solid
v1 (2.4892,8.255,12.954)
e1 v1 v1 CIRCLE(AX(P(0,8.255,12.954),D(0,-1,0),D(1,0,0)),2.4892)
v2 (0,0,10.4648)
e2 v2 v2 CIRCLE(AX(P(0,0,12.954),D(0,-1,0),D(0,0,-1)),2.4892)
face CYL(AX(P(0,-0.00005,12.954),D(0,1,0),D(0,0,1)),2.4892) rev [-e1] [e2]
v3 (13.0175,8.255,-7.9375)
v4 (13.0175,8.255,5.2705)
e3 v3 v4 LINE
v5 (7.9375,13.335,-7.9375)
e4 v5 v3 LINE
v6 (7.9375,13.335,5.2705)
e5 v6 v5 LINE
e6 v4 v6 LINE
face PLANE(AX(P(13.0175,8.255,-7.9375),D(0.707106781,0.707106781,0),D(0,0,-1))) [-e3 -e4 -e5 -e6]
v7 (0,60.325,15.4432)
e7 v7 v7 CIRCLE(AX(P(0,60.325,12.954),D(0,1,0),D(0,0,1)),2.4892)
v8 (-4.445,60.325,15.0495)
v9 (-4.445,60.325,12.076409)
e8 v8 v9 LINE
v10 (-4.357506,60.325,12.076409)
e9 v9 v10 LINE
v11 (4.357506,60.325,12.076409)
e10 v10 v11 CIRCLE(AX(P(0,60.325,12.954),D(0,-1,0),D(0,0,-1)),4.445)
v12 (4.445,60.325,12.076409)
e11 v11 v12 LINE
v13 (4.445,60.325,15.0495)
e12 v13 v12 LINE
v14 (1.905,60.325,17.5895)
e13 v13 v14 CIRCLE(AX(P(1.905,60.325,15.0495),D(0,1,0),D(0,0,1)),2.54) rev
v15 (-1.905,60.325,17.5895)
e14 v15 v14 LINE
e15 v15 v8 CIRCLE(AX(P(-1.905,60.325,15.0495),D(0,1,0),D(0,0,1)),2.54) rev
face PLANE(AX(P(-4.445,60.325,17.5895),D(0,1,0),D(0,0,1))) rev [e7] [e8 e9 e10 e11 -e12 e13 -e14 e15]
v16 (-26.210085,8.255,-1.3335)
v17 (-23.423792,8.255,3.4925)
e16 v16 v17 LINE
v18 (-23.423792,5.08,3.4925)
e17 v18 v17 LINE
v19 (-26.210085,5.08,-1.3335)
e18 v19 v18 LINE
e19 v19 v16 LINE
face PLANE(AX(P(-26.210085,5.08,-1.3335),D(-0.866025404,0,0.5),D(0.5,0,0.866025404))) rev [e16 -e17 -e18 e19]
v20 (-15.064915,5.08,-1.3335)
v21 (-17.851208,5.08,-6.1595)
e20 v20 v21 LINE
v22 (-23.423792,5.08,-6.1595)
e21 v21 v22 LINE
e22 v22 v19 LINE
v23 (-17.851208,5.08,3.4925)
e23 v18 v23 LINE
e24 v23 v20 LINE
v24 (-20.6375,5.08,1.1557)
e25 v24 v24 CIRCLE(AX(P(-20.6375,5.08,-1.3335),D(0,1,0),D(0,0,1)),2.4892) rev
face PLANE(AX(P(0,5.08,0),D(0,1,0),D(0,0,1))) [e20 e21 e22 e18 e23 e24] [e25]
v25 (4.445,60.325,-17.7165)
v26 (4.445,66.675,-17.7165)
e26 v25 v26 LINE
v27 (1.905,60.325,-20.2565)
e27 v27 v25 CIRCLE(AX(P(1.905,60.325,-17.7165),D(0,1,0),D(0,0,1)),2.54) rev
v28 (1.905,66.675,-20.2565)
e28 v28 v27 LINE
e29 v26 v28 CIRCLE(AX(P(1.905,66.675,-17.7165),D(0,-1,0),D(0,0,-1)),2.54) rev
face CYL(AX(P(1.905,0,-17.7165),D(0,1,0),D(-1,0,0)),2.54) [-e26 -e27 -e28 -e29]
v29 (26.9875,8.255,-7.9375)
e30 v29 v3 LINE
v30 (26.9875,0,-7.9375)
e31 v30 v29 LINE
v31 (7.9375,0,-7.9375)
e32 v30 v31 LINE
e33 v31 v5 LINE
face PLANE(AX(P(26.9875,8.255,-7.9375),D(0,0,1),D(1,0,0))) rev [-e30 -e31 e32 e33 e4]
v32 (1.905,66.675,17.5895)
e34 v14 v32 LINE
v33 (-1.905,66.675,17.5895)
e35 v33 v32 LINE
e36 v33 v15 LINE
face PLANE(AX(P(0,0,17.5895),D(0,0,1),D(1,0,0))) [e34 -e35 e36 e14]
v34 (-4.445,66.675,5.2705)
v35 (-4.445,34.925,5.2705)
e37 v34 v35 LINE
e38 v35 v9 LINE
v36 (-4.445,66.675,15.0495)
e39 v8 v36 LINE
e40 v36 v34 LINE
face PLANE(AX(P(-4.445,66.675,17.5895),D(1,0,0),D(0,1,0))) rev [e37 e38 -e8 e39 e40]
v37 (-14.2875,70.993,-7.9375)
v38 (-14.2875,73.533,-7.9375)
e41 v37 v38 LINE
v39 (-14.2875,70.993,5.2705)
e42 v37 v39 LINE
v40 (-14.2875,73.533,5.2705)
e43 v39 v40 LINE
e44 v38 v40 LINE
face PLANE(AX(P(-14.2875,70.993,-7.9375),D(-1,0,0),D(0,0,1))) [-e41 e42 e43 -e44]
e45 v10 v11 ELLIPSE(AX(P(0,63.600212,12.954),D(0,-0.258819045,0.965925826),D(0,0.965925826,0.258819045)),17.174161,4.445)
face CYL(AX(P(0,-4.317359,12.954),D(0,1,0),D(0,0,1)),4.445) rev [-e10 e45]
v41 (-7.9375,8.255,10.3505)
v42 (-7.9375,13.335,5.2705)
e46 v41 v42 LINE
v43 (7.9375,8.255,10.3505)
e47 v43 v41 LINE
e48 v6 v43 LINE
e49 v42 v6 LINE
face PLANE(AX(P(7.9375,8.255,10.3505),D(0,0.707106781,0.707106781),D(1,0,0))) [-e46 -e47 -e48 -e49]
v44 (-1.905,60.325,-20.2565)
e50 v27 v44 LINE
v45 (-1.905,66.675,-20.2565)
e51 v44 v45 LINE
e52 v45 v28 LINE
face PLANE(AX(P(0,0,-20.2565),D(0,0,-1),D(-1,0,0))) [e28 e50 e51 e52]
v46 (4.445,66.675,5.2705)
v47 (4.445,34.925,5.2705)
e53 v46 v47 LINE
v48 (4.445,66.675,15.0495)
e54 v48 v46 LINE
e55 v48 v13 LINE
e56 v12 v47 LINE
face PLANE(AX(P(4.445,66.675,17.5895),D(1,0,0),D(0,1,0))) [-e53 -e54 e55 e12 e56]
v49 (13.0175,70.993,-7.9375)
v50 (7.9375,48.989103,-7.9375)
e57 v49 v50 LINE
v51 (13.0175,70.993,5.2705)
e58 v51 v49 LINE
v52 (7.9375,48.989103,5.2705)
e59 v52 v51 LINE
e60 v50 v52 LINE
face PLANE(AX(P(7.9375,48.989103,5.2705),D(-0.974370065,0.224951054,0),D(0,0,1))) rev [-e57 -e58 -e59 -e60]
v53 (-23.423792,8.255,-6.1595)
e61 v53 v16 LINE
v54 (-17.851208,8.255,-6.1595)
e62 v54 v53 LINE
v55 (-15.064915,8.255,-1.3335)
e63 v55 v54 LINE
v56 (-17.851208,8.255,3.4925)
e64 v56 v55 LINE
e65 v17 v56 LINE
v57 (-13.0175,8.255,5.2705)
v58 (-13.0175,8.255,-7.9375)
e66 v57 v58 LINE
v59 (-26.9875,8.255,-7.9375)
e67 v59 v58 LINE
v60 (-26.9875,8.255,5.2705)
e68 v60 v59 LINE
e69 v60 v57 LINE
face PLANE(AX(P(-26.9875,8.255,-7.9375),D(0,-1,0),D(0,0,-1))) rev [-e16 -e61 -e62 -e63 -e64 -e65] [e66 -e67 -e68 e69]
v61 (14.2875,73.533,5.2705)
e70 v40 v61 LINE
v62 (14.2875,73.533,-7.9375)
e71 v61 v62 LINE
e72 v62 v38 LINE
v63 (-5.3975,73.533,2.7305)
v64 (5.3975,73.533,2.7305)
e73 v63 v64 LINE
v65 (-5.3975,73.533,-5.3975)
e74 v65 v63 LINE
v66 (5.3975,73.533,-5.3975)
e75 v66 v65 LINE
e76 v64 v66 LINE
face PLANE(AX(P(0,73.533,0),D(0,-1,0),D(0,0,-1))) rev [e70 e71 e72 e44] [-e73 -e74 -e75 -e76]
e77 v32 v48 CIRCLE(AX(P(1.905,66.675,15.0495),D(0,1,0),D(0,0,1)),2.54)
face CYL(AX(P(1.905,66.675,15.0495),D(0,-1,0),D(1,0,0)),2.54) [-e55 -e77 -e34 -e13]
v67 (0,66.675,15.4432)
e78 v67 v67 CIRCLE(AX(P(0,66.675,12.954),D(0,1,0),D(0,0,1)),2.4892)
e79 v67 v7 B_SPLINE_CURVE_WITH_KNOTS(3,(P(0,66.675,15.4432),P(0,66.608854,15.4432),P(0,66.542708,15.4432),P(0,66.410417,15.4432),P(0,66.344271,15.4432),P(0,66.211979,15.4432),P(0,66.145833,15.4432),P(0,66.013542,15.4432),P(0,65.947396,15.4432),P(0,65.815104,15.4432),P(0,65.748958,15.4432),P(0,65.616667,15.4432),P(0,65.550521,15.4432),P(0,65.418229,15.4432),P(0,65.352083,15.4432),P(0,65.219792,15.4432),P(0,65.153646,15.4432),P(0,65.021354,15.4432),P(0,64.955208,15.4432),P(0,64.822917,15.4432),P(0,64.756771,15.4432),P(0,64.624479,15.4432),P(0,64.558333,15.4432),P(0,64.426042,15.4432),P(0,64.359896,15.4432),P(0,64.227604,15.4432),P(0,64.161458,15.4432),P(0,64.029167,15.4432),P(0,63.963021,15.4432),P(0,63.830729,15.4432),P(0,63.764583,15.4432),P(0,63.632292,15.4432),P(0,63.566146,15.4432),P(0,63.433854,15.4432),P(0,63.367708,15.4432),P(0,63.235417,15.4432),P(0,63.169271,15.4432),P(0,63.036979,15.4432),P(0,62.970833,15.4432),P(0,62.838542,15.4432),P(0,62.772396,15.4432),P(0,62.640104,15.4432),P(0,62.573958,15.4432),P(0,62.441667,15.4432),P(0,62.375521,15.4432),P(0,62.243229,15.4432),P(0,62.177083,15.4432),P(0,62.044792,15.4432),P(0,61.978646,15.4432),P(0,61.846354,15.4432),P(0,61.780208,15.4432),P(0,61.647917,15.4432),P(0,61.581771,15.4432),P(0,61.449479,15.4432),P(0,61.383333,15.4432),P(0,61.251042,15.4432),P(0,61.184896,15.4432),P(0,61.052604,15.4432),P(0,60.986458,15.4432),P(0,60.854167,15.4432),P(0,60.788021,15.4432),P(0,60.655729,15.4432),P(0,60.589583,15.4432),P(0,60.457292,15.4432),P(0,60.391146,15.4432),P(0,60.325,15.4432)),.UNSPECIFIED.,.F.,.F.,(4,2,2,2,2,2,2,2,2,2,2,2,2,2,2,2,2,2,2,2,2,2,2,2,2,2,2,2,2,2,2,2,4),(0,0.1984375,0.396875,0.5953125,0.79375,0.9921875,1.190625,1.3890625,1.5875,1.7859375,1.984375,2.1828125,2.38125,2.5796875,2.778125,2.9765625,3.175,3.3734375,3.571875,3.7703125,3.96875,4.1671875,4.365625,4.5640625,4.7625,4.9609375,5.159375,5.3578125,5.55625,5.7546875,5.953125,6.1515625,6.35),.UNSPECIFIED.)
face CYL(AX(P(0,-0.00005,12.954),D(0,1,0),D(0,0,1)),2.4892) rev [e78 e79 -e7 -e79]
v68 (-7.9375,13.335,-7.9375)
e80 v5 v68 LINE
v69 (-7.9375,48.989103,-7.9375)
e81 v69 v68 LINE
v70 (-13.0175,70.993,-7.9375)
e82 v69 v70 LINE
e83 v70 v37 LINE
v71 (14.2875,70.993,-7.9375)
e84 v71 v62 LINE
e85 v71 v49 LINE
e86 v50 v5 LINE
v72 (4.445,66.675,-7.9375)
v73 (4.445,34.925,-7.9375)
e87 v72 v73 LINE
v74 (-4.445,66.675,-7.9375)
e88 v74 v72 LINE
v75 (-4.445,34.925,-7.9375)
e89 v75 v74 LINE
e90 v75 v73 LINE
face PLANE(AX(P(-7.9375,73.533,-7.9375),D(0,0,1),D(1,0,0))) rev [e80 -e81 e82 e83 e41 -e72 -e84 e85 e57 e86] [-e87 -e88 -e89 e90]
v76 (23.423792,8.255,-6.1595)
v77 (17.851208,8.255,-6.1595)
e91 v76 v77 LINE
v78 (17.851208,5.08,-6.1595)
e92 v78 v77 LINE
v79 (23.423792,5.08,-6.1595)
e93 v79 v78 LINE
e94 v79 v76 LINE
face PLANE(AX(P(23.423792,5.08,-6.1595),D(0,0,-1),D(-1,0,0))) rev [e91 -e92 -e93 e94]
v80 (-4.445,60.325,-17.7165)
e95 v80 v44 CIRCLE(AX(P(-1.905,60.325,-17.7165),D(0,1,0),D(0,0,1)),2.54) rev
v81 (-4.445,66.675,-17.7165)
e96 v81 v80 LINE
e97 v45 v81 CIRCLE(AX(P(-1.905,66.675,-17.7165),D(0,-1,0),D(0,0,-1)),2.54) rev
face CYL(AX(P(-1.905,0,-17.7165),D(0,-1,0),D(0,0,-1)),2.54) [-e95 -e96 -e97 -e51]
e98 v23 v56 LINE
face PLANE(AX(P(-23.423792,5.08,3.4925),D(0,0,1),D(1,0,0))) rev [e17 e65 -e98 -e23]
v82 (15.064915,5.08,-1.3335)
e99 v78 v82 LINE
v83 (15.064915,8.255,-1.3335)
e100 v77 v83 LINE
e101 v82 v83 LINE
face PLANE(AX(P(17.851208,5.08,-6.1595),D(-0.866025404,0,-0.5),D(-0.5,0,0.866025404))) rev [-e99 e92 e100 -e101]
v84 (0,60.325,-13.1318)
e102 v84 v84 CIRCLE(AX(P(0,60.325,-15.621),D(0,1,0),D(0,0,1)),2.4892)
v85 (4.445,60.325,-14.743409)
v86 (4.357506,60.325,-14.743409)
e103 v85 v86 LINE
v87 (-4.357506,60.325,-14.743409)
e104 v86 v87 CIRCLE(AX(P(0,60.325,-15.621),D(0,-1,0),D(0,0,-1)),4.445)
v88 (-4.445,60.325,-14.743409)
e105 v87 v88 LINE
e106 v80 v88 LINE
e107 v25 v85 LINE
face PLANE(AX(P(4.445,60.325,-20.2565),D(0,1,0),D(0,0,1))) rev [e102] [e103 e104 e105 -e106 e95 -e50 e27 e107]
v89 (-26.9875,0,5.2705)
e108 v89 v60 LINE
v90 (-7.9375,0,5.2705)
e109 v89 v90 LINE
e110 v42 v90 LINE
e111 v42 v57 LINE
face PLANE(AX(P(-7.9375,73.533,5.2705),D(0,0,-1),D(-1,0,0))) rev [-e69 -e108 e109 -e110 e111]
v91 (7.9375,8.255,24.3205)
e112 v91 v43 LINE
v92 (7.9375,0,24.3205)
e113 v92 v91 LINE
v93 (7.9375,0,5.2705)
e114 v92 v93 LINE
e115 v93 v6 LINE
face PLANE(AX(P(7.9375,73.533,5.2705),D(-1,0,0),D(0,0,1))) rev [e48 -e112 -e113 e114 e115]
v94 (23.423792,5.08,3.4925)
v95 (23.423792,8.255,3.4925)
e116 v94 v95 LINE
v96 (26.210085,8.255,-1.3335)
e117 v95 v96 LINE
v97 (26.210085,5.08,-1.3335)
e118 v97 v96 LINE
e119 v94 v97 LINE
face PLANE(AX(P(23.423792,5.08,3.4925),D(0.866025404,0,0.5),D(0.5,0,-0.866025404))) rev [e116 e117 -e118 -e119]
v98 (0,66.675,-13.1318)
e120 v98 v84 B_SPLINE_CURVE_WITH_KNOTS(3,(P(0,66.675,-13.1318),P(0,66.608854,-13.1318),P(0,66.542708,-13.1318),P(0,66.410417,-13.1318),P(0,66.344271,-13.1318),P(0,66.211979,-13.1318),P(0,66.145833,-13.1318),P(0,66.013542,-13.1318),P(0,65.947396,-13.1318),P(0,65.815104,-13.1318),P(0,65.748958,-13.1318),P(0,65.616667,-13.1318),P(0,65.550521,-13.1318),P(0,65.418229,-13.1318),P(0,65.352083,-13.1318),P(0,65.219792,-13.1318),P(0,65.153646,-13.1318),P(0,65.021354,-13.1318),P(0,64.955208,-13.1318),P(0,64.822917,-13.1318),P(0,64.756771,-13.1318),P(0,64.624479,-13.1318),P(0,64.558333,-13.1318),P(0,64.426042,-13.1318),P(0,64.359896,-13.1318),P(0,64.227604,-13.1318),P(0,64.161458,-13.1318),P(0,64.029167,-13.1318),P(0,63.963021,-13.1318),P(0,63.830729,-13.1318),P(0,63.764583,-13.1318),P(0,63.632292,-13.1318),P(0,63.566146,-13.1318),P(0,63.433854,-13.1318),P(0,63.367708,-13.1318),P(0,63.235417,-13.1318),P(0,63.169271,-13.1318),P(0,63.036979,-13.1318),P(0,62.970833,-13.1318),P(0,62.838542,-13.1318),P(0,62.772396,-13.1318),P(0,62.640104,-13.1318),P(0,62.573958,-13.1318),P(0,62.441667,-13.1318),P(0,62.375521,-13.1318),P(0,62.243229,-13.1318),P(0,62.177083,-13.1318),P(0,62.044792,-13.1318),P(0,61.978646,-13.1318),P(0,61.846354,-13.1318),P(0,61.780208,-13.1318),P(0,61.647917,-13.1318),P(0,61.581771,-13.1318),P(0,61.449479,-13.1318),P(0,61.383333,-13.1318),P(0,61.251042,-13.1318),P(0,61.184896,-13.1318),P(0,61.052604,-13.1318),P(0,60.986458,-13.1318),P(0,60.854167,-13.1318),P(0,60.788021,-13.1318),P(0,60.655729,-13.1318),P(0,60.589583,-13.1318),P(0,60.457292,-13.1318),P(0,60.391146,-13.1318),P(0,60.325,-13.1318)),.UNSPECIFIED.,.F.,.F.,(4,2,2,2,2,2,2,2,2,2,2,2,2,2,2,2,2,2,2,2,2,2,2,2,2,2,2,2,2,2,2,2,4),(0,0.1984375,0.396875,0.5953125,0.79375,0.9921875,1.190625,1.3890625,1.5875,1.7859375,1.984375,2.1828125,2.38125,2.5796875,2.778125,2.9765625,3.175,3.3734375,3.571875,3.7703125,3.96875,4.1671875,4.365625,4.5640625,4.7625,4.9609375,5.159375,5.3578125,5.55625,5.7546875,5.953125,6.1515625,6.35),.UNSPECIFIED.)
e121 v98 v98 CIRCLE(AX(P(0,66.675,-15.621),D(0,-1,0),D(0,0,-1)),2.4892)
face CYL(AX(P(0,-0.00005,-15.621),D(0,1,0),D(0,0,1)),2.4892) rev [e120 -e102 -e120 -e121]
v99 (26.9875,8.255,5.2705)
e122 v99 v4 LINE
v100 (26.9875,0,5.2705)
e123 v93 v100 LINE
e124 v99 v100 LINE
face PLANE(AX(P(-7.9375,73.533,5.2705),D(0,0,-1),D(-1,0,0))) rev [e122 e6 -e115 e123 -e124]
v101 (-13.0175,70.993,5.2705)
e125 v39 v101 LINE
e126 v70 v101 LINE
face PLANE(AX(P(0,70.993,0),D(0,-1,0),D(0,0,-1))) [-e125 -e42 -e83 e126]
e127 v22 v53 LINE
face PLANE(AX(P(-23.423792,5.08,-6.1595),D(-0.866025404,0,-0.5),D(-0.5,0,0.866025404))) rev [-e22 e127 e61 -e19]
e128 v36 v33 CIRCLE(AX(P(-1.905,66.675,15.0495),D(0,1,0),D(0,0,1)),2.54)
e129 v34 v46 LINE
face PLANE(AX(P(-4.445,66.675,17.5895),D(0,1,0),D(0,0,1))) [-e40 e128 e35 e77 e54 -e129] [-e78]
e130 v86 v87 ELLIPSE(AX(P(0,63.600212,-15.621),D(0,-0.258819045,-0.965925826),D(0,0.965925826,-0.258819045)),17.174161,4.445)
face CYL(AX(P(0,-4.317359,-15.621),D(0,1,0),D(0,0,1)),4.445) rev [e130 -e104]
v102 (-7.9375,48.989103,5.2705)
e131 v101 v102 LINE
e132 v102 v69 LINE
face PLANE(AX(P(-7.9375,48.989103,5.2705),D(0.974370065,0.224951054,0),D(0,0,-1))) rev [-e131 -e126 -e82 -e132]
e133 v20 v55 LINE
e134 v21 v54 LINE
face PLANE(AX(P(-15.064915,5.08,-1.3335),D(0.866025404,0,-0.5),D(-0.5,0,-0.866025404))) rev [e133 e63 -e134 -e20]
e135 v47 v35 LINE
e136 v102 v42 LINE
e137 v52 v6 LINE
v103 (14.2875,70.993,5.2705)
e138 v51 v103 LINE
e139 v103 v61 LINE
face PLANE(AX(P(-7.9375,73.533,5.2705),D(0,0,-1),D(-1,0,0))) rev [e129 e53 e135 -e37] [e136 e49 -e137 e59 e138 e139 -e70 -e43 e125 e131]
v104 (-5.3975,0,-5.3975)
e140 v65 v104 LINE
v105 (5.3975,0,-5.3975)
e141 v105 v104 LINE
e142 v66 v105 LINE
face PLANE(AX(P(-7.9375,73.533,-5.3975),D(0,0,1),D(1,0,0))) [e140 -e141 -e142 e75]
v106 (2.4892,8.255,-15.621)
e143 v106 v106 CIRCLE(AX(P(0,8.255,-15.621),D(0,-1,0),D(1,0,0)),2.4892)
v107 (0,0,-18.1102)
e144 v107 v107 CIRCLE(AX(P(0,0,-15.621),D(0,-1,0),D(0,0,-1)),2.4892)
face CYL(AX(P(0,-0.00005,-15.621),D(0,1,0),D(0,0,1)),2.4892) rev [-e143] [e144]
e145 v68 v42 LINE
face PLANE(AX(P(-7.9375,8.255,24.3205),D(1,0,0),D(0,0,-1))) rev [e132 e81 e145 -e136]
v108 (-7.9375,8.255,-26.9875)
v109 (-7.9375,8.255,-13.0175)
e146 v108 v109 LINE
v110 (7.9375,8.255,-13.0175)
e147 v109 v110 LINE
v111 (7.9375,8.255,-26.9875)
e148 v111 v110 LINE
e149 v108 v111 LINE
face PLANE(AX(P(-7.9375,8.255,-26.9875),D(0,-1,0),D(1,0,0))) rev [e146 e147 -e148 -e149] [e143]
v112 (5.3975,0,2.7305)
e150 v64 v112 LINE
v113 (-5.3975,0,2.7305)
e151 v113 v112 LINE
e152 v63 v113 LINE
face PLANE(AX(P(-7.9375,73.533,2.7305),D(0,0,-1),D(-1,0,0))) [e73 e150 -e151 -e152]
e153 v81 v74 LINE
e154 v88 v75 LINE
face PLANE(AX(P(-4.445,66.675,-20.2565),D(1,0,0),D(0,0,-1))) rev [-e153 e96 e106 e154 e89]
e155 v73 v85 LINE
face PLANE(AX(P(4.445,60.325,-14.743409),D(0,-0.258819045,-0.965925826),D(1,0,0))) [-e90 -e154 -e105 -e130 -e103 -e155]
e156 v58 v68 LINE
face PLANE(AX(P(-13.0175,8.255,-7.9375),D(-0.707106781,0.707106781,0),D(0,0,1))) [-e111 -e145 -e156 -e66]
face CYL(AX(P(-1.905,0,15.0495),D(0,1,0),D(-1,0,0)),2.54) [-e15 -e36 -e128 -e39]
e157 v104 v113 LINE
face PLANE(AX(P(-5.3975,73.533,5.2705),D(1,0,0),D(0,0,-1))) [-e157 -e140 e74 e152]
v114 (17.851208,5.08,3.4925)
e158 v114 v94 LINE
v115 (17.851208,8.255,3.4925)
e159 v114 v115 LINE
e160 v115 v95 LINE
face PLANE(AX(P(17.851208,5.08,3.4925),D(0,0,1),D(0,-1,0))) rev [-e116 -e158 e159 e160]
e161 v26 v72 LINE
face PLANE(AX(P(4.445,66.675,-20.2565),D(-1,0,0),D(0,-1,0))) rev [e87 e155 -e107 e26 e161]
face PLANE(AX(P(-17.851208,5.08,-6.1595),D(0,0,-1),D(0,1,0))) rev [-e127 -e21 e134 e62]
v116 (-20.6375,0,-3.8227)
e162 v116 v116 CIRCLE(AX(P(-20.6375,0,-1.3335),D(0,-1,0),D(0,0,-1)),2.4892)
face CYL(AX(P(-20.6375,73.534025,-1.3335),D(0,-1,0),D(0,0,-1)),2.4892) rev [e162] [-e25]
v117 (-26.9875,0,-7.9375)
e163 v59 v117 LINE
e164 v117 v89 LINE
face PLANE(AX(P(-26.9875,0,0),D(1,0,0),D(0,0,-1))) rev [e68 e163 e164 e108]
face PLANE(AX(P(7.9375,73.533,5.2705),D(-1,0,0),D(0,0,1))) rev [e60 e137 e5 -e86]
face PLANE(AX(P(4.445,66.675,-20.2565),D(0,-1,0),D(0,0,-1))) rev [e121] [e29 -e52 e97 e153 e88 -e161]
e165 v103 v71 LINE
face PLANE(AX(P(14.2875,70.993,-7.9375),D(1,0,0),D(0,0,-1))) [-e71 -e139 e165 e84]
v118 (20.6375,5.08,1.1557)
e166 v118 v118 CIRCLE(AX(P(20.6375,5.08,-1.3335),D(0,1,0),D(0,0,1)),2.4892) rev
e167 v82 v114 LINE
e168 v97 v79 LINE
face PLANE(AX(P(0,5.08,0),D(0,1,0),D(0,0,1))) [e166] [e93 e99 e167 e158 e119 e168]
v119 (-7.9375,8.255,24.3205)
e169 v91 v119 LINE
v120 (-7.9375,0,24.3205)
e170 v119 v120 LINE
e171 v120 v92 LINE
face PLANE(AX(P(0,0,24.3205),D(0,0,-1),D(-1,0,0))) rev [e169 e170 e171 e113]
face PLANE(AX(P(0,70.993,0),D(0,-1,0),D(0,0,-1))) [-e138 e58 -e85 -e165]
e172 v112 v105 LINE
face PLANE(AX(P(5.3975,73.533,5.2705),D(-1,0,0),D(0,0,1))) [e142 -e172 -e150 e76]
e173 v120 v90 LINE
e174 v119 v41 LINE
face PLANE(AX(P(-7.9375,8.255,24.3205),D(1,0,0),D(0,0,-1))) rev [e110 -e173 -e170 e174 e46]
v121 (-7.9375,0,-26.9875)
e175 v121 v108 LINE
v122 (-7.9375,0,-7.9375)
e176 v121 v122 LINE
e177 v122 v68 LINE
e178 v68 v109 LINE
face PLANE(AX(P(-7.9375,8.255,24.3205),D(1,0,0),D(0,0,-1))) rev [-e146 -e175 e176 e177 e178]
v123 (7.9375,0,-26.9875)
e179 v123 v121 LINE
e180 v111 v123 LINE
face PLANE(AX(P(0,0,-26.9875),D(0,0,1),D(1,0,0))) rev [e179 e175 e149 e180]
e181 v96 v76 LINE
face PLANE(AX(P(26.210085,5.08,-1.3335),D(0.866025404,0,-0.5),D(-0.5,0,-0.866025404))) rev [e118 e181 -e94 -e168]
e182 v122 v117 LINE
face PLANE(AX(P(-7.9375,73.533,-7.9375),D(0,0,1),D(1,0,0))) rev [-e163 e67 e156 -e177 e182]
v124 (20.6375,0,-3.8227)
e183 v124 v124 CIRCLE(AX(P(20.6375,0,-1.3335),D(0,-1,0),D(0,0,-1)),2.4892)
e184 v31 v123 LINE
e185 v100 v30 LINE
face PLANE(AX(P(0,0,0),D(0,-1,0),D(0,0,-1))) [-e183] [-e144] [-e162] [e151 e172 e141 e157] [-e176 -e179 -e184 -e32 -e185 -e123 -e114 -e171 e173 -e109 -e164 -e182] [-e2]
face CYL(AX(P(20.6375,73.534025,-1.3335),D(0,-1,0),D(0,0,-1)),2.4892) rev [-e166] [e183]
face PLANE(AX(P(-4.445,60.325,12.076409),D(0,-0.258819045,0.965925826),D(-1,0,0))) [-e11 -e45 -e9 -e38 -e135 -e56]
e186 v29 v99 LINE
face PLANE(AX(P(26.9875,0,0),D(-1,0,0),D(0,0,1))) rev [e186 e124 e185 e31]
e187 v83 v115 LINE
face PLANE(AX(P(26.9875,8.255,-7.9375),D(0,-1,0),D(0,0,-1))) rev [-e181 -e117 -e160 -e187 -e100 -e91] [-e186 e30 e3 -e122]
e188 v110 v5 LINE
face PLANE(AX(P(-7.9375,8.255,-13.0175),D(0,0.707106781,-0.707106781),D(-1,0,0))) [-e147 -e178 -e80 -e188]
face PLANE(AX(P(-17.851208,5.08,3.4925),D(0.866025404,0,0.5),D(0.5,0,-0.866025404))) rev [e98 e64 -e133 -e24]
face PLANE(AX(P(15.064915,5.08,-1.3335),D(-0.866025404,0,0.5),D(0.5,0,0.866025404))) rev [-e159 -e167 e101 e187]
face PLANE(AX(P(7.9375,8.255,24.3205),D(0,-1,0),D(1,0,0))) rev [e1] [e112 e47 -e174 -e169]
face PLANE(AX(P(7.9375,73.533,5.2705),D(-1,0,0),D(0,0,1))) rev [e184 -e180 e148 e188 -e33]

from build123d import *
from OCP.BRepFilletAPI import BRepFilletAPI_MakeChamfer

# Parameters (mm, degrees)
SKETCH1_W           = 15.875
SKETCH1_H           = 13.208
BOSS_EXTRUDE1_DEPTH = 73.533
SHELL1_T            = -2.54
SKETCH3_W           = 8.89
SKETCH3_H           = 6.35
BOSS_EXTRUDE2_DEPTH = 12.319
SKETCH4_W           = 8.89
SKETCH4_H           = 6.35
BOSS_EXTRUDE3_DEPTH = 12.319
SKETCH5_W           = 13.208
SKETCH5_H           = 8.255
BOSS_EXTRUDE4_DEPTH = 19.05
SKETCH6_W           = 15.875
SKETCH6_H           = 8.255
BOSS_EXTRUDE5_DEPTH = 19.05
SKETCH7_W           = 13.208
SKETCH7_H           = 8.255
BOSS_EXTRUDE6_DEPTH = 19.05
SKETCH8_W           = 15.875
SKETCH8_H           = 8.255
BOSS_EXTRUDE7_DEPTH = 19.05
SKETCH9_R           = 2.4892
CUT_EXTRUDE1_DEPTH  = 83.847766424
CUT_EXTRUDE2_REACH  = 84.848
SKETCH11_R          = 2.4892
FILLET3_R           = 2.54
CHAMFER2_SIZE       = 25.4
CHAMFER2_SIZE_2     = 6.805909488
SKETCH12_R          = 4.445
CUT_EXTRUDE3_DEPTH  = 52.07
SKETCH13_W          = 28.575
SKETCH13_H          = 13.208
SKETCH13_W_2        = 10.795
SKETCH13_H_2        = 8.128
BOSS_EXTRUDE8_DEPTH = 2.54
CHAMFER3_SIZE       = 5.08
CHAMFER3_SIZE2      = 22.003897441
CHAMFER4_SIZE       = 5.08
CHAMFER5_SIZE       = 5.08
CUT_EXTRUDE4_DEPTH  = 3.175
CUT_EXTRUDE5_DEPTH  = 3.175


# Some blends are built 0.0001 mm under size
with BuildPart() as part:
    # Sketch1 → Boss-Extrude1 (new body)
    with BuildSketch(Plane(origin=(0, 0, 0), x_dir=(1, 0, 0), z_dir=(0, 1, 0))):
        with Locations((0, 1.3335)):
            Rectangle(SKETCH1_W, SKETCH1_H)
    extrude(amount=BOSS_EXTRUDE1_DEPTH)

    # Shell1
    shell1_openings = [part.faces().sort_by_distance(p)[0] for p in [
        (0, 73.533, -1.3335),
        (0, 0, -1.3335),
    ]]
    offset(amount=SHELL1_T, openings=shell1_openings, kind=Kind.INTERSECTION)

    # Sketch3 → Boss-Extrude2 (add)
    with BuildSketch(Plane(origin=(0, 0, -7.9375), x_dir=(-1, 0, 0), z_dir=(0, 0, -1))):
        with Locations((0, 63.5)):
            Rectangle(SKETCH3_W, SKETCH3_H)
    extrude(amount=BOSS_EXTRUDE2_DEPTH)

    # Sketch4 → Boss-Extrude3 (add)
    with BuildSketch(Plane.XY.offset(5.2705)):
        with Locations((0, 63.5)):
            Rectangle(SKETCH4_W, SKETCH4_H)
    extrude(amount=BOSS_EXTRUDE3_DEPTH)

    # Sketch5 → Boss-Extrude4 (add)
    with BuildSketch(Plane.ZY.offset(7.9375)):
        with Locations((-1.3335, 4.1275)):
            Rectangle(SKETCH5_W, SKETCH5_H)
    extrude(amount=BOSS_EXTRUDE4_DEPTH)

    # Sketch6 → Boss-Extrude5 (add)
    with BuildSketch(Plane(origin=(0, 0, -7.9375), x_dir=(-1, 0, 0), z_dir=(0, 0, -1))):
        with Locations((0, 4.1275)):
            Rectangle(SKETCH6_W, SKETCH6_H)
    extrude(amount=BOSS_EXTRUDE5_DEPTH)

    # Sketch7 → Boss-Extrude6 (add)
    with BuildSketch(Plane(origin=(7.9375, 0, 0), x_dir=(0, 0, -1), z_dir=(1, 0, 0))):
        with Locations((1.3335, 4.1275)):
            Rectangle(SKETCH7_W, SKETCH7_H)
    extrude(amount=BOSS_EXTRUDE6_DEPTH)

    # Sketch8 → Boss-Extrude7 (add)
    with BuildSketch(Plane.XY.offset(5.2705)):
        with Locations((0, 4.1275)):
            Rectangle(SKETCH8_W, SKETCH8_H)
    extrude(amount=BOSS_EXTRUDE7_DEPTH)

    # Sketch9 → Cut-Extrude1 (cut, through all)
    with BuildSketch(Plane(origin=(0, 73.533, 0), x_dir=(1, 0, 0), z_dir=(0, 1, 0))):
        with Locations((0, 15.621)):
            Circle(SKETCH9_R)
        with Locations((0, -12.954)):
            Circle(SKETCH9_R)
    extrude(amount=-CUT_EXTRUDE1_DEPTH, mode=Mode.SUBTRACT)

    # Sketch11 → Cut-Extrude2 (cut, up to next)
    with BuildSketch(Plane(origin=(0, 0, 0), x_dir=(-1, 0, 0), z_dir=(0, -1, 0)), mode=Mode.PRIVATE) as cut_extrude2_sk1:
        with Locations(Location((20.6375, 1.3335, 0), (0, 0, 90))):
            Circle(SKETCH11_R)
    cut_extrude2_tool1 = extrude(cut_extrude2_sk1.sketch, amount=-CUT_EXTRUDE2_REACH, mode=Mode.PRIVATE) & part.part
    # Sketch11 → Cut-Extrude2 (cut, up to next)
    with BuildSketch(Plane(origin=(0, 0, 0), x_dir=(-1, 0, 0), z_dir=(0, -1, 0)), mode=Mode.PRIVATE) as cut_extrude2_sk2:
        with Locations(Location((-20.6375, 1.3335, 0), (0, 0, 90))):
            Circle(SKETCH11_R)
    cut_extrude2_tool2 = extrude(cut_extrude2_sk2.sketch, amount=-CUT_EXTRUDE2_REACH, mode=Mode.PRIVATE) & part.part
    add(cut_extrude2_tool1.solids().sort_by_distance((-20.6375, 0, -1.3335))[0], mode=Mode.SUBTRACT)
    add(cut_extrude2_tool2.solids().sort_by_distance((20.6375, 0, -1.3335))[0], mode=Mode.SUBTRACT)

    # Fillet3
    fillet3_edges = [part.edges().sort_by_distance(p)[0] for p in [
        (4.445, 63.5, -20.2565),
        (-4.445, 63.5, -20.2565),
        (4.445, 63.5, 17.5895),
        (-4.445, 63.5, 17.5895),
    ]]
    fillet(fillet3_edges, radius=FILLET3_R)

    # Chamfer2
    # the kernel refuses this chamfer: 25.4, 6.805909488 mm, written as the material it adds along each edge
    with BuildSketch(Plane(origin=(-4.445, 60.325, -7.9375), x_dir=(0, -0.9999503267608393, 0.00996714657715642), z_dir=(1, 0, 0))) as chamfer2_piece_1_section:
        Polygon((CHAMFER2_SIZE * 0.999950326761, CHAMFER2_SIZE * 0.00996714657716), (-CHAMFER2_SIZE_2 * 0.00996714657679, CHAMFER2_SIZE_2 * 0.999950326724), (0, 0), align=None)
    chamfer2_piece_1 = extrude(amount=8.89, mode=Mode.PRIVATE)
    chamfer2_piece_1 = chamfer2_piece_1 - Plane(origin=(0, 51.301210878, -15.621), x_dir=(1, 0, 0), z_dir=(0, 1, 0)) * Cylinder(2.4892, 120, mode=Mode.PRIVATE)
    add(chamfer2_piece_1)
    with BuildSketch(Plane(origin=(4.445, 60.325, 5.2705), x_dir=(0, -0.9999503267608393, -0.00996714657715642), z_dir=(-1, 0, 0))) as chamfer2_piece_2_section:
        Polygon((CHAMFER2_SIZE * 0.999950326761, CHAMFER2_SIZE * 0.00996714657716), (-CHAMFER2_SIZE_2 * 0.00996714657679, CHAMFER2_SIZE_2 * 0.999950326724), (0, 0), align=None)
    chamfer2_piece_2 = extrude(amount=8.89, mode=Mode.PRIVATE)
    chamfer2_piece_2 = chamfer2_piece_2 - Plane(origin=(0, 51.301210878, 12.954), x_dir=(1, 0, 0), z_dir=(0, 1, 0)) * Cylinder(2.4892, 120, mode=Mode.PRIVATE)
    add(chamfer2_piece_2)

    # Sketch12 → Cut-Extrude3 (cut)
    with BuildSketch(Plane.XZ.offset(-60.325)):
        with Locations((0, -15.621)):
            Circle(SKETCH12_R)
        with Locations((0, 12.954)):
            Circle(SKETCH12_R)
    extrude(amount=CUT_EXTRUDE3_DEPTH, mode=Mode.SUBTRACT)

    # Sketch13 → Boss-Extrude8 (add)
    with BuildSketch(Plane(origin=(0, 73.533, 0), x_dir=(1, 0, 0), z_dir=(0, 1, 0))):
        with Locations((0, 1.3335)):
            Rectangle(SKETCH13_W, SKETCH13_H)
        with Locations((0, 1.3335)):
            Rectangle(SKETCH13_W_2, SKETCH13_H_2, mode=Mode.SUBTRACT)
    extrude(amount=-BOSS_EXTRUDE8_DEPTH)

    # Chamfer3: one chamfer whose edges measure the first distance from different faces: ONE call of the kernel's chamfer builder (chamfer() names one face for all edges)
    chamfer3_edges_1 = [part.edges().sort_by_distance(p)[0] for p in [
        (7.9375, 70.993, -1.3335),
    ]]
    chamfer3_side_1 = [part.faces().sort_by_distance(p)[0] for p in [
        (11.1125, 70.993, -1.3335),
    ]]
    chamfer3_edges_2 = [part.edges().sort_by_distance(p)[0] for p in [
        (-7.9375, 70.993, -1.3335),
    ]]
    chamfer3_side_2 = [part.faces().sort_by_distance(p)[0] for p in [
        (-11.1125, 70.993, -1.3335),
    ]]
    chamfer3 = BRepFilletAPI_MakeChamfer(part.part.solid().wrapped)
    for e in chamfer3_edges_1:
        chamfer3.Add(CHAMFER3_SIZE, CHAMFER3_SIZE2, e.wrapped, chamfer3_side_1[0].wrapped)  # the first distance lies on this face
    for e in chamfer3_edges_2:
        chamfer3.Add(CHAMFER3_SIZE, CHAMFER3_SIZE2, e.wrapped, chamfer3_side_2[0].wrapped)  # the first distance lies on this face
    add(Compound.cast(chamfer3.Shape()), mode=Mode.REPLACE)

    # Chamfer4
    # the kernel refuses this chamfer: 5.08 mm, written as the material it adds along each edge
    with BuildSketch(Plane(origin=(-7.9375, 8.255, -7.9375), x_dir=(0, 0.9996219169112968, 0.027495876610586438), z_dir=(1, 0, 0)), Plane(origin=(7.9375, 8.255, 5.2705), x_dir=(0, 0.9996219169112968, -0.027495876610586438), z_dir=(-1, 0, 0))) as chamfer4_piece_1:
        Polygon((CHAMFER4_SIZE * 0.999621916911, -CHAMFER4_SIZE * 0.0274958766106), (-CHAMFER4_SIZE * 0.0274958766106, -CHAMFER4_SIZE * 0.999621916911), (0, 0), align=None)
    extrude(amount=15.875)

    # Chamfer5
    chamfer5_edges = [part.edges().sort_by_distance(p)[0] for p in [
        (-7.9375, 8.255, -1.3335),
        (7.9375, 8.255, -1.3335),
    ]]
    chamfer(chamfer5_edges, length=CHAMFER5_SIZE - 0.0001)  # a hair under: the kernel refuses the full size

    # Sketch14 → Cut-Extrude4 (cut)
    with BuildSketch(Plane(origin=(0, 8.255, 0), x_dir=(1, 0, 0), z_dir=(0, 1, 0))):
        Polygon((-26.210084798, 1.3335), (-23.423792399, -3.4925), (-17.851207601, -3.4925), (-15.064915202, 1.3335), (-17.851207601, 6.1595), (-23.423792399, 6.1595), align=None)
    extrude(amount=-CUT_EXTRUDE4_DEPTH, mode=Mode.SUBTRACT)

    # Sketch15 → Cut-Extrude5 (cut)
    with BuildSketch(Plane(origin=(0, 8.255, 0), x_dir=(1, 0, 0), z_dir=(0, 1, 0))):
        Polygon((15.064915202, 1.3335), (17.851207601, -3.4925), (23.423792399, -3.4925), (26.210084798, 1.3335), (23.423792399, 6.1595), (17.851207601, 6.1595), align=None)
    extrude(amount=-CUT_EXTRUDE5_DEPTH, mode=Mode.SUBTRACT)


solid = part.part
